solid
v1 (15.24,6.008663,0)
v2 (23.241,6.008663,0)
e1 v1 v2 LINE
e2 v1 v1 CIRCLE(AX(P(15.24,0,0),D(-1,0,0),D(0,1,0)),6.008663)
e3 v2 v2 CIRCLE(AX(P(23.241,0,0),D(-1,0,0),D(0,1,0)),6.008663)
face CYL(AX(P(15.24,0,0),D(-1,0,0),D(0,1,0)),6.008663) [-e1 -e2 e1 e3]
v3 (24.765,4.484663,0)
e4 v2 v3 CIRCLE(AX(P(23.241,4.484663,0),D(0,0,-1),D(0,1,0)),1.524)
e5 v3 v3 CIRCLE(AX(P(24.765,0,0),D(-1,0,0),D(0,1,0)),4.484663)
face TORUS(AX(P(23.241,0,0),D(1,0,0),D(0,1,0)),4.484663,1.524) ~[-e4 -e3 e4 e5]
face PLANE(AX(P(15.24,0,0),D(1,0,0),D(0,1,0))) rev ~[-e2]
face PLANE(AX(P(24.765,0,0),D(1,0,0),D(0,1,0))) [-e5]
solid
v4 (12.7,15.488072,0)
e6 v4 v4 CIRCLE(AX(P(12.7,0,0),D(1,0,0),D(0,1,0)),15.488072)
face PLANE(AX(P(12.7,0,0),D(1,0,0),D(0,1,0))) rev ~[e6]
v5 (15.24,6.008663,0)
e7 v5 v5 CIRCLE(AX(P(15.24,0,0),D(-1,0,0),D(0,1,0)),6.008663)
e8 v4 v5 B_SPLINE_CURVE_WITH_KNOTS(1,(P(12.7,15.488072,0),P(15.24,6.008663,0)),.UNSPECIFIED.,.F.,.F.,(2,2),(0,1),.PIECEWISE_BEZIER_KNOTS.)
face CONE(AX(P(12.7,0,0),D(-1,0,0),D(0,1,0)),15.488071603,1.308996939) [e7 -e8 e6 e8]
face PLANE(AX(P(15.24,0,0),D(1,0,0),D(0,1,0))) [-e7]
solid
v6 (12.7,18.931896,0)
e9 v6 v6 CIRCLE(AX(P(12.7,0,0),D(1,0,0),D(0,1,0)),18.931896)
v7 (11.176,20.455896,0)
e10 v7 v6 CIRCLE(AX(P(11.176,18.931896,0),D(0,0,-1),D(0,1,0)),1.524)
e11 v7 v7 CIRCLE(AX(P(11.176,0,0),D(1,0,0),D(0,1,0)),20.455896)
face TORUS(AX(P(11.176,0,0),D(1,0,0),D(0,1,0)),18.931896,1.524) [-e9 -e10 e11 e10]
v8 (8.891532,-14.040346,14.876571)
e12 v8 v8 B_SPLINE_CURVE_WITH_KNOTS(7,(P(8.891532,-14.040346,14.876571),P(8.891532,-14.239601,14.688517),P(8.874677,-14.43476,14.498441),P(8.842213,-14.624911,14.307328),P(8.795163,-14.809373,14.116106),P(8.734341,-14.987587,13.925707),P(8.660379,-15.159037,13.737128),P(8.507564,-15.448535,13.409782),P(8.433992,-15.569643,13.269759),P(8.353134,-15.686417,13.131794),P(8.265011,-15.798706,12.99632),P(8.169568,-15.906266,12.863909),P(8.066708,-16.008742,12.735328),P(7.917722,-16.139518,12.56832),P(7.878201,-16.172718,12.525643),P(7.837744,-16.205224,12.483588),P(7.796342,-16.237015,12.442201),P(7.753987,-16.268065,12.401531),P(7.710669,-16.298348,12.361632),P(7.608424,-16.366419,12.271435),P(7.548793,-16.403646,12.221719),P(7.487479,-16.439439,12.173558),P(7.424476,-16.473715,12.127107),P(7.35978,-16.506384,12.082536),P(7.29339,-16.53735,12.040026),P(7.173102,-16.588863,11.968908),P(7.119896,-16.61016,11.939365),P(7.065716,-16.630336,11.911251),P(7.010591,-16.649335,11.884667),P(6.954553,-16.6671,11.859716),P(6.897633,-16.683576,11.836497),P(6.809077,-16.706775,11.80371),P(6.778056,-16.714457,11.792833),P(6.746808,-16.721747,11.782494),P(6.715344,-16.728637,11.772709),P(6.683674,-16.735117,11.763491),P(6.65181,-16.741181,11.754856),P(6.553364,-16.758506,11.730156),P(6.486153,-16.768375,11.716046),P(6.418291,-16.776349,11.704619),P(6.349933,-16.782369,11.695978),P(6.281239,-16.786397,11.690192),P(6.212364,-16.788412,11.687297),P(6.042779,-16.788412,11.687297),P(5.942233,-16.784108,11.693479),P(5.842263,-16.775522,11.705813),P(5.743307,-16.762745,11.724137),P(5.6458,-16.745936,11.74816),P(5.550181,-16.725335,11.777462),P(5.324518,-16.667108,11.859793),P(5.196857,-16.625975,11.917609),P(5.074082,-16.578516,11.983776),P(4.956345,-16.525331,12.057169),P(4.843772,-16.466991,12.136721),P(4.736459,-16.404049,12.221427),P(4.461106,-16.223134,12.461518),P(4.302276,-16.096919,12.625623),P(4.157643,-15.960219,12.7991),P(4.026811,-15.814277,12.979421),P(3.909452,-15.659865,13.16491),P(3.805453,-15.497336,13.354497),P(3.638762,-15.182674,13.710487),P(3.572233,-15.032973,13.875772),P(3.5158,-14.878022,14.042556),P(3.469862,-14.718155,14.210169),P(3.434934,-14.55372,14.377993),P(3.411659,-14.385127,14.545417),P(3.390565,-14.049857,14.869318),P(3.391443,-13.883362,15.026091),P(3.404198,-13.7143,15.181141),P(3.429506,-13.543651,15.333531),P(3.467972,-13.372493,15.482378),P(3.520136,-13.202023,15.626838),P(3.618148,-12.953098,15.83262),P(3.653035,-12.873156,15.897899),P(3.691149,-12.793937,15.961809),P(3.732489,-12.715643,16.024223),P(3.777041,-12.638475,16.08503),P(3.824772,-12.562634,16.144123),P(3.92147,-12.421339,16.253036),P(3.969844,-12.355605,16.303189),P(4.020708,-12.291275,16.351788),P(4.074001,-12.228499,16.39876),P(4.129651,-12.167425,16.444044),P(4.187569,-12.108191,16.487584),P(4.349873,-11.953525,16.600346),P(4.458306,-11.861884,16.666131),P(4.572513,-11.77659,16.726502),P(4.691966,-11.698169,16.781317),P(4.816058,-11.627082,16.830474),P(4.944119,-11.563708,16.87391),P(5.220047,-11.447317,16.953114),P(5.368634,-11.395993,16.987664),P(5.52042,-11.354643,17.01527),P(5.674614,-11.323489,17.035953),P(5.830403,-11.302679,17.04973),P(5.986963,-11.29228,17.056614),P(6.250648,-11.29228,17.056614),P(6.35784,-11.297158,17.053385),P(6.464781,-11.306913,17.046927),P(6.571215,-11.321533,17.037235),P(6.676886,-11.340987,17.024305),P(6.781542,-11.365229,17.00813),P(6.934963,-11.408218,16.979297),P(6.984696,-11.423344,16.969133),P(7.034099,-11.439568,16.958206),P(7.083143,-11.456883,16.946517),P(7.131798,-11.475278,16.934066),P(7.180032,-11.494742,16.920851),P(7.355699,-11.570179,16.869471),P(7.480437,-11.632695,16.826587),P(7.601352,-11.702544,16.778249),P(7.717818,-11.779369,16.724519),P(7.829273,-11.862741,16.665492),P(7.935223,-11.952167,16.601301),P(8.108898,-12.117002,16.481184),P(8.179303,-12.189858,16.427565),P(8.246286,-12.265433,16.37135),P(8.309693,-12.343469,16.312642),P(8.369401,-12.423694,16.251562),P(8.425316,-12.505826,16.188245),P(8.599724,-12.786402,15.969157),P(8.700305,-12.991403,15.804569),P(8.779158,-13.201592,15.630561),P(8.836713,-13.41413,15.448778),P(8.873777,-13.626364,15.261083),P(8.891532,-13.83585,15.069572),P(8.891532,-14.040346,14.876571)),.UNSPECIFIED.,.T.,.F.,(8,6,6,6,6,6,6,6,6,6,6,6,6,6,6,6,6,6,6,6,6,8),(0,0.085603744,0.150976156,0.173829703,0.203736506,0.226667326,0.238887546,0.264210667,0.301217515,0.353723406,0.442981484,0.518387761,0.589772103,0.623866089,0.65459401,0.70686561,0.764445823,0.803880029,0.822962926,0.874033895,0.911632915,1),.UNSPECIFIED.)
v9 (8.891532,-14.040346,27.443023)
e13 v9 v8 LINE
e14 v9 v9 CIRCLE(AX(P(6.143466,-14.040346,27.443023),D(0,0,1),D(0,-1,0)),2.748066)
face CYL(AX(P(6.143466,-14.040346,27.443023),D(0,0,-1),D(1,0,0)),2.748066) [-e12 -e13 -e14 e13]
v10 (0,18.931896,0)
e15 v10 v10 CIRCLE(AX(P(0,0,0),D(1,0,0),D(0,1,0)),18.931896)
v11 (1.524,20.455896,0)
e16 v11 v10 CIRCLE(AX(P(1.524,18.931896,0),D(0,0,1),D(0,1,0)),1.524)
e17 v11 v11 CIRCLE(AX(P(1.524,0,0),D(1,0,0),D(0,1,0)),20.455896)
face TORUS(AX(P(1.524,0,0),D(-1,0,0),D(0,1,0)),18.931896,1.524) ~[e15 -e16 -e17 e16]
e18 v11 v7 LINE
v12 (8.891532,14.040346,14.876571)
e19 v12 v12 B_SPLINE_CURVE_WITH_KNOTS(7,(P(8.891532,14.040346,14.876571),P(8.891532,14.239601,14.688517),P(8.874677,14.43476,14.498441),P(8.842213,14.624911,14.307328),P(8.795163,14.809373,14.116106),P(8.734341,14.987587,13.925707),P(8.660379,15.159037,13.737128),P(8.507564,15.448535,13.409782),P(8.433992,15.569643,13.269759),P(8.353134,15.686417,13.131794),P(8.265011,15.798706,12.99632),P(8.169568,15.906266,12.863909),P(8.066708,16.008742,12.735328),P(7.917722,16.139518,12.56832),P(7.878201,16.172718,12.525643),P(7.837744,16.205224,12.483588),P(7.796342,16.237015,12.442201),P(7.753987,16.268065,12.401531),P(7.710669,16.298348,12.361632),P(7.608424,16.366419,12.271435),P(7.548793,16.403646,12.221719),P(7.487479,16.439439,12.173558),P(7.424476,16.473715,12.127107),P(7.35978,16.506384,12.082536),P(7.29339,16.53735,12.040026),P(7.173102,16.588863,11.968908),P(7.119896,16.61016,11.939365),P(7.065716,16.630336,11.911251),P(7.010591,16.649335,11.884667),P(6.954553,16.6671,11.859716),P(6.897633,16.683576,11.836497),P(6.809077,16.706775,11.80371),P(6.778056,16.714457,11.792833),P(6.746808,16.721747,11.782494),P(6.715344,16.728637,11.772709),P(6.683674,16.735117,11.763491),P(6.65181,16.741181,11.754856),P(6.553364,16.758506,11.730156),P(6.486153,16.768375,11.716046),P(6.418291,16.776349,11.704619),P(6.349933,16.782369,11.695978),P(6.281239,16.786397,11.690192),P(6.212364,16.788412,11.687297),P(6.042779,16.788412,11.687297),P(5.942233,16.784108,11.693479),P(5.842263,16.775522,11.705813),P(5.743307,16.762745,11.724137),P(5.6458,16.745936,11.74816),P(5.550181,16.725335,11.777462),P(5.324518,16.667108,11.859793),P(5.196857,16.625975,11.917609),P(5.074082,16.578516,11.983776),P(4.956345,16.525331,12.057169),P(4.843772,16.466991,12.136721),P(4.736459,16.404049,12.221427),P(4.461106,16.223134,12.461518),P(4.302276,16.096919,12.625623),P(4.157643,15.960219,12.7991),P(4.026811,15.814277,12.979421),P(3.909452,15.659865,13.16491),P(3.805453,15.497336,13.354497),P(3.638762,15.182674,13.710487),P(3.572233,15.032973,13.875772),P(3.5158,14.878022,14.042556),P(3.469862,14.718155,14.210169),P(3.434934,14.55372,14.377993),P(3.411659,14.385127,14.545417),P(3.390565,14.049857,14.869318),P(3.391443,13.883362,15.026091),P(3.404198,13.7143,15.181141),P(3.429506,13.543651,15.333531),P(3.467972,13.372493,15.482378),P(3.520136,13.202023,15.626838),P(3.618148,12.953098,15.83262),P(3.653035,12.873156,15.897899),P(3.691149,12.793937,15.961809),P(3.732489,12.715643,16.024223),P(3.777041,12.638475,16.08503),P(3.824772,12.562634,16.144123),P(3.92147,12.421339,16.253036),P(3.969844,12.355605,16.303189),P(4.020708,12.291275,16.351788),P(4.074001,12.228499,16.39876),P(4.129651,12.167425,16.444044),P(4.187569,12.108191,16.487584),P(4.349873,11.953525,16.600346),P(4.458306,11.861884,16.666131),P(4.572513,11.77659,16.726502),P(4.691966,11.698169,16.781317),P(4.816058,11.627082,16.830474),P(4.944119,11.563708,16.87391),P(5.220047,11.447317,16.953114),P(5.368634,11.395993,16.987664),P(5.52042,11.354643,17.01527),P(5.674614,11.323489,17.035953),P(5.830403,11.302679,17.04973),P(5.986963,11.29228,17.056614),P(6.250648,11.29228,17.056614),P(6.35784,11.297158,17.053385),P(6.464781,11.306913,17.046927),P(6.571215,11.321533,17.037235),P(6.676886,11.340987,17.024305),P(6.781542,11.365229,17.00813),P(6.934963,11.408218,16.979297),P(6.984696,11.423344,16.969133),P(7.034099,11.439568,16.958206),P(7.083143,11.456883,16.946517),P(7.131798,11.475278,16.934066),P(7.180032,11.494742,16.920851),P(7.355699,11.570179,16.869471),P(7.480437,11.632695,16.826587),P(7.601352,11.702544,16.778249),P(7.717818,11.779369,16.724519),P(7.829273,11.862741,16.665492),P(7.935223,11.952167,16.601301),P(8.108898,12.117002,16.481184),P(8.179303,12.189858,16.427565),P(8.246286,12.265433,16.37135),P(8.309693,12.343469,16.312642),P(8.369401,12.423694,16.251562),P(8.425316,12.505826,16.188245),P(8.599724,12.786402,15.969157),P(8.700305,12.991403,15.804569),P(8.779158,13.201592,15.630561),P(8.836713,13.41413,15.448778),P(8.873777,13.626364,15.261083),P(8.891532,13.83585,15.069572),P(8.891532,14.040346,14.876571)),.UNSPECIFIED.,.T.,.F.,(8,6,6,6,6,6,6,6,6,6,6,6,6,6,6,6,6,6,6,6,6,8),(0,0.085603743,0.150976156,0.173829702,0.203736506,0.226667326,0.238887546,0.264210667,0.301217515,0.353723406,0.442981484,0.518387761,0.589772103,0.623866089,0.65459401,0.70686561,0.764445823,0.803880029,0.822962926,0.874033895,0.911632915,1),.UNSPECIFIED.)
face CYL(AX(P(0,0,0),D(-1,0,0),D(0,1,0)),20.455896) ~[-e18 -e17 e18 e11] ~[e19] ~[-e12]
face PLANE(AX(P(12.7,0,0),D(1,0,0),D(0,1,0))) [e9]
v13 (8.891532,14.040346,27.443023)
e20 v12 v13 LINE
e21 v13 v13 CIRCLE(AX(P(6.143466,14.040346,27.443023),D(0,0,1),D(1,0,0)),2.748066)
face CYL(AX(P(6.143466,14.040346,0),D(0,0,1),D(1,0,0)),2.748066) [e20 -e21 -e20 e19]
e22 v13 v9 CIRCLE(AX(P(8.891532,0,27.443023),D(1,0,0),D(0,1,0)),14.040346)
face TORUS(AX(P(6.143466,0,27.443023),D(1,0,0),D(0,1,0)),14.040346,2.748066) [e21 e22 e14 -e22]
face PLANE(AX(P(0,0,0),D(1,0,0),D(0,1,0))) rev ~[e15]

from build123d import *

# Parameters (mm, degrees)
F0_R     = 20.4558961716
F1_DEPTH = 12.7
F3_R     = 2.7480657839
F7_R     = 15.4880716028
F8_DEPTH = 2.54
F8_TAPER = 75
F9_DEPTH = 9.525
F10_R    = 1.524
F11_R    = 1.524


with BuildPart() as f1:
    # F0 (on Right) → F1 (new body)
    with BuildSketch(Plane.YZ):
        Circle(F0_R)
    extrude(amount=F1_DEPTH)

    # F6: sweep along a path in F5
    with BuildLine(Plane.YZ.offset(6.35)) as f6_path:
        Line((14.0403462574, 0), (14.0403462574, 27.4430233985))
        ThreePointArc((14.0403462574, 27.4430233985), (0, 41.4833696559), (-14.0403462574, 27.4430233985))
        Line((-14.0403462574, 27.4430233985), (-14.0403462574, 0))
    # F3 (on Top) → F6 (sweep)
    with BuildSketch(Plane.XY):
        with Locations((6.1434661038, 14.0403462574)):
            Circle(F3_R)
    sweep(path=f6_path.line)

    # F11
    f11_edges = [f1.edges().sort_by_distance(p)[0] for p in [
        (0, -20.455896, 0),
        (12.7, -20.455896, 0),
    ]]
    fillet(f11_edges, radius=F11_R)


with BuildPart() as f8:
    # F7 (on face) → F8 (new body)
    with BuildSketch(Plane.YZ.offset(12.7)):
        Circle(F7_R)
    extrude(amount=F8_DEPTH, taper=F8_TAPER)


with BuildPart() as f9:
    # F9 (new): a face of the model
    f9_faces = [f8.part.faces().sort_by_distance(p)[0] for p in [
        (15.24, 0, 0),
    ]]
    extrude(f9_faces, amount=F9_DEPTH)

    # F10
    f10_edges = [f9.edges().sort_by_distance(p)[0] for p in [
        (24.765, -6.008663, 0),
    ]]
    fillet(f10_edges, radius=F10_R)


solid = Compound([f1.part, f8.part, f9.part])
